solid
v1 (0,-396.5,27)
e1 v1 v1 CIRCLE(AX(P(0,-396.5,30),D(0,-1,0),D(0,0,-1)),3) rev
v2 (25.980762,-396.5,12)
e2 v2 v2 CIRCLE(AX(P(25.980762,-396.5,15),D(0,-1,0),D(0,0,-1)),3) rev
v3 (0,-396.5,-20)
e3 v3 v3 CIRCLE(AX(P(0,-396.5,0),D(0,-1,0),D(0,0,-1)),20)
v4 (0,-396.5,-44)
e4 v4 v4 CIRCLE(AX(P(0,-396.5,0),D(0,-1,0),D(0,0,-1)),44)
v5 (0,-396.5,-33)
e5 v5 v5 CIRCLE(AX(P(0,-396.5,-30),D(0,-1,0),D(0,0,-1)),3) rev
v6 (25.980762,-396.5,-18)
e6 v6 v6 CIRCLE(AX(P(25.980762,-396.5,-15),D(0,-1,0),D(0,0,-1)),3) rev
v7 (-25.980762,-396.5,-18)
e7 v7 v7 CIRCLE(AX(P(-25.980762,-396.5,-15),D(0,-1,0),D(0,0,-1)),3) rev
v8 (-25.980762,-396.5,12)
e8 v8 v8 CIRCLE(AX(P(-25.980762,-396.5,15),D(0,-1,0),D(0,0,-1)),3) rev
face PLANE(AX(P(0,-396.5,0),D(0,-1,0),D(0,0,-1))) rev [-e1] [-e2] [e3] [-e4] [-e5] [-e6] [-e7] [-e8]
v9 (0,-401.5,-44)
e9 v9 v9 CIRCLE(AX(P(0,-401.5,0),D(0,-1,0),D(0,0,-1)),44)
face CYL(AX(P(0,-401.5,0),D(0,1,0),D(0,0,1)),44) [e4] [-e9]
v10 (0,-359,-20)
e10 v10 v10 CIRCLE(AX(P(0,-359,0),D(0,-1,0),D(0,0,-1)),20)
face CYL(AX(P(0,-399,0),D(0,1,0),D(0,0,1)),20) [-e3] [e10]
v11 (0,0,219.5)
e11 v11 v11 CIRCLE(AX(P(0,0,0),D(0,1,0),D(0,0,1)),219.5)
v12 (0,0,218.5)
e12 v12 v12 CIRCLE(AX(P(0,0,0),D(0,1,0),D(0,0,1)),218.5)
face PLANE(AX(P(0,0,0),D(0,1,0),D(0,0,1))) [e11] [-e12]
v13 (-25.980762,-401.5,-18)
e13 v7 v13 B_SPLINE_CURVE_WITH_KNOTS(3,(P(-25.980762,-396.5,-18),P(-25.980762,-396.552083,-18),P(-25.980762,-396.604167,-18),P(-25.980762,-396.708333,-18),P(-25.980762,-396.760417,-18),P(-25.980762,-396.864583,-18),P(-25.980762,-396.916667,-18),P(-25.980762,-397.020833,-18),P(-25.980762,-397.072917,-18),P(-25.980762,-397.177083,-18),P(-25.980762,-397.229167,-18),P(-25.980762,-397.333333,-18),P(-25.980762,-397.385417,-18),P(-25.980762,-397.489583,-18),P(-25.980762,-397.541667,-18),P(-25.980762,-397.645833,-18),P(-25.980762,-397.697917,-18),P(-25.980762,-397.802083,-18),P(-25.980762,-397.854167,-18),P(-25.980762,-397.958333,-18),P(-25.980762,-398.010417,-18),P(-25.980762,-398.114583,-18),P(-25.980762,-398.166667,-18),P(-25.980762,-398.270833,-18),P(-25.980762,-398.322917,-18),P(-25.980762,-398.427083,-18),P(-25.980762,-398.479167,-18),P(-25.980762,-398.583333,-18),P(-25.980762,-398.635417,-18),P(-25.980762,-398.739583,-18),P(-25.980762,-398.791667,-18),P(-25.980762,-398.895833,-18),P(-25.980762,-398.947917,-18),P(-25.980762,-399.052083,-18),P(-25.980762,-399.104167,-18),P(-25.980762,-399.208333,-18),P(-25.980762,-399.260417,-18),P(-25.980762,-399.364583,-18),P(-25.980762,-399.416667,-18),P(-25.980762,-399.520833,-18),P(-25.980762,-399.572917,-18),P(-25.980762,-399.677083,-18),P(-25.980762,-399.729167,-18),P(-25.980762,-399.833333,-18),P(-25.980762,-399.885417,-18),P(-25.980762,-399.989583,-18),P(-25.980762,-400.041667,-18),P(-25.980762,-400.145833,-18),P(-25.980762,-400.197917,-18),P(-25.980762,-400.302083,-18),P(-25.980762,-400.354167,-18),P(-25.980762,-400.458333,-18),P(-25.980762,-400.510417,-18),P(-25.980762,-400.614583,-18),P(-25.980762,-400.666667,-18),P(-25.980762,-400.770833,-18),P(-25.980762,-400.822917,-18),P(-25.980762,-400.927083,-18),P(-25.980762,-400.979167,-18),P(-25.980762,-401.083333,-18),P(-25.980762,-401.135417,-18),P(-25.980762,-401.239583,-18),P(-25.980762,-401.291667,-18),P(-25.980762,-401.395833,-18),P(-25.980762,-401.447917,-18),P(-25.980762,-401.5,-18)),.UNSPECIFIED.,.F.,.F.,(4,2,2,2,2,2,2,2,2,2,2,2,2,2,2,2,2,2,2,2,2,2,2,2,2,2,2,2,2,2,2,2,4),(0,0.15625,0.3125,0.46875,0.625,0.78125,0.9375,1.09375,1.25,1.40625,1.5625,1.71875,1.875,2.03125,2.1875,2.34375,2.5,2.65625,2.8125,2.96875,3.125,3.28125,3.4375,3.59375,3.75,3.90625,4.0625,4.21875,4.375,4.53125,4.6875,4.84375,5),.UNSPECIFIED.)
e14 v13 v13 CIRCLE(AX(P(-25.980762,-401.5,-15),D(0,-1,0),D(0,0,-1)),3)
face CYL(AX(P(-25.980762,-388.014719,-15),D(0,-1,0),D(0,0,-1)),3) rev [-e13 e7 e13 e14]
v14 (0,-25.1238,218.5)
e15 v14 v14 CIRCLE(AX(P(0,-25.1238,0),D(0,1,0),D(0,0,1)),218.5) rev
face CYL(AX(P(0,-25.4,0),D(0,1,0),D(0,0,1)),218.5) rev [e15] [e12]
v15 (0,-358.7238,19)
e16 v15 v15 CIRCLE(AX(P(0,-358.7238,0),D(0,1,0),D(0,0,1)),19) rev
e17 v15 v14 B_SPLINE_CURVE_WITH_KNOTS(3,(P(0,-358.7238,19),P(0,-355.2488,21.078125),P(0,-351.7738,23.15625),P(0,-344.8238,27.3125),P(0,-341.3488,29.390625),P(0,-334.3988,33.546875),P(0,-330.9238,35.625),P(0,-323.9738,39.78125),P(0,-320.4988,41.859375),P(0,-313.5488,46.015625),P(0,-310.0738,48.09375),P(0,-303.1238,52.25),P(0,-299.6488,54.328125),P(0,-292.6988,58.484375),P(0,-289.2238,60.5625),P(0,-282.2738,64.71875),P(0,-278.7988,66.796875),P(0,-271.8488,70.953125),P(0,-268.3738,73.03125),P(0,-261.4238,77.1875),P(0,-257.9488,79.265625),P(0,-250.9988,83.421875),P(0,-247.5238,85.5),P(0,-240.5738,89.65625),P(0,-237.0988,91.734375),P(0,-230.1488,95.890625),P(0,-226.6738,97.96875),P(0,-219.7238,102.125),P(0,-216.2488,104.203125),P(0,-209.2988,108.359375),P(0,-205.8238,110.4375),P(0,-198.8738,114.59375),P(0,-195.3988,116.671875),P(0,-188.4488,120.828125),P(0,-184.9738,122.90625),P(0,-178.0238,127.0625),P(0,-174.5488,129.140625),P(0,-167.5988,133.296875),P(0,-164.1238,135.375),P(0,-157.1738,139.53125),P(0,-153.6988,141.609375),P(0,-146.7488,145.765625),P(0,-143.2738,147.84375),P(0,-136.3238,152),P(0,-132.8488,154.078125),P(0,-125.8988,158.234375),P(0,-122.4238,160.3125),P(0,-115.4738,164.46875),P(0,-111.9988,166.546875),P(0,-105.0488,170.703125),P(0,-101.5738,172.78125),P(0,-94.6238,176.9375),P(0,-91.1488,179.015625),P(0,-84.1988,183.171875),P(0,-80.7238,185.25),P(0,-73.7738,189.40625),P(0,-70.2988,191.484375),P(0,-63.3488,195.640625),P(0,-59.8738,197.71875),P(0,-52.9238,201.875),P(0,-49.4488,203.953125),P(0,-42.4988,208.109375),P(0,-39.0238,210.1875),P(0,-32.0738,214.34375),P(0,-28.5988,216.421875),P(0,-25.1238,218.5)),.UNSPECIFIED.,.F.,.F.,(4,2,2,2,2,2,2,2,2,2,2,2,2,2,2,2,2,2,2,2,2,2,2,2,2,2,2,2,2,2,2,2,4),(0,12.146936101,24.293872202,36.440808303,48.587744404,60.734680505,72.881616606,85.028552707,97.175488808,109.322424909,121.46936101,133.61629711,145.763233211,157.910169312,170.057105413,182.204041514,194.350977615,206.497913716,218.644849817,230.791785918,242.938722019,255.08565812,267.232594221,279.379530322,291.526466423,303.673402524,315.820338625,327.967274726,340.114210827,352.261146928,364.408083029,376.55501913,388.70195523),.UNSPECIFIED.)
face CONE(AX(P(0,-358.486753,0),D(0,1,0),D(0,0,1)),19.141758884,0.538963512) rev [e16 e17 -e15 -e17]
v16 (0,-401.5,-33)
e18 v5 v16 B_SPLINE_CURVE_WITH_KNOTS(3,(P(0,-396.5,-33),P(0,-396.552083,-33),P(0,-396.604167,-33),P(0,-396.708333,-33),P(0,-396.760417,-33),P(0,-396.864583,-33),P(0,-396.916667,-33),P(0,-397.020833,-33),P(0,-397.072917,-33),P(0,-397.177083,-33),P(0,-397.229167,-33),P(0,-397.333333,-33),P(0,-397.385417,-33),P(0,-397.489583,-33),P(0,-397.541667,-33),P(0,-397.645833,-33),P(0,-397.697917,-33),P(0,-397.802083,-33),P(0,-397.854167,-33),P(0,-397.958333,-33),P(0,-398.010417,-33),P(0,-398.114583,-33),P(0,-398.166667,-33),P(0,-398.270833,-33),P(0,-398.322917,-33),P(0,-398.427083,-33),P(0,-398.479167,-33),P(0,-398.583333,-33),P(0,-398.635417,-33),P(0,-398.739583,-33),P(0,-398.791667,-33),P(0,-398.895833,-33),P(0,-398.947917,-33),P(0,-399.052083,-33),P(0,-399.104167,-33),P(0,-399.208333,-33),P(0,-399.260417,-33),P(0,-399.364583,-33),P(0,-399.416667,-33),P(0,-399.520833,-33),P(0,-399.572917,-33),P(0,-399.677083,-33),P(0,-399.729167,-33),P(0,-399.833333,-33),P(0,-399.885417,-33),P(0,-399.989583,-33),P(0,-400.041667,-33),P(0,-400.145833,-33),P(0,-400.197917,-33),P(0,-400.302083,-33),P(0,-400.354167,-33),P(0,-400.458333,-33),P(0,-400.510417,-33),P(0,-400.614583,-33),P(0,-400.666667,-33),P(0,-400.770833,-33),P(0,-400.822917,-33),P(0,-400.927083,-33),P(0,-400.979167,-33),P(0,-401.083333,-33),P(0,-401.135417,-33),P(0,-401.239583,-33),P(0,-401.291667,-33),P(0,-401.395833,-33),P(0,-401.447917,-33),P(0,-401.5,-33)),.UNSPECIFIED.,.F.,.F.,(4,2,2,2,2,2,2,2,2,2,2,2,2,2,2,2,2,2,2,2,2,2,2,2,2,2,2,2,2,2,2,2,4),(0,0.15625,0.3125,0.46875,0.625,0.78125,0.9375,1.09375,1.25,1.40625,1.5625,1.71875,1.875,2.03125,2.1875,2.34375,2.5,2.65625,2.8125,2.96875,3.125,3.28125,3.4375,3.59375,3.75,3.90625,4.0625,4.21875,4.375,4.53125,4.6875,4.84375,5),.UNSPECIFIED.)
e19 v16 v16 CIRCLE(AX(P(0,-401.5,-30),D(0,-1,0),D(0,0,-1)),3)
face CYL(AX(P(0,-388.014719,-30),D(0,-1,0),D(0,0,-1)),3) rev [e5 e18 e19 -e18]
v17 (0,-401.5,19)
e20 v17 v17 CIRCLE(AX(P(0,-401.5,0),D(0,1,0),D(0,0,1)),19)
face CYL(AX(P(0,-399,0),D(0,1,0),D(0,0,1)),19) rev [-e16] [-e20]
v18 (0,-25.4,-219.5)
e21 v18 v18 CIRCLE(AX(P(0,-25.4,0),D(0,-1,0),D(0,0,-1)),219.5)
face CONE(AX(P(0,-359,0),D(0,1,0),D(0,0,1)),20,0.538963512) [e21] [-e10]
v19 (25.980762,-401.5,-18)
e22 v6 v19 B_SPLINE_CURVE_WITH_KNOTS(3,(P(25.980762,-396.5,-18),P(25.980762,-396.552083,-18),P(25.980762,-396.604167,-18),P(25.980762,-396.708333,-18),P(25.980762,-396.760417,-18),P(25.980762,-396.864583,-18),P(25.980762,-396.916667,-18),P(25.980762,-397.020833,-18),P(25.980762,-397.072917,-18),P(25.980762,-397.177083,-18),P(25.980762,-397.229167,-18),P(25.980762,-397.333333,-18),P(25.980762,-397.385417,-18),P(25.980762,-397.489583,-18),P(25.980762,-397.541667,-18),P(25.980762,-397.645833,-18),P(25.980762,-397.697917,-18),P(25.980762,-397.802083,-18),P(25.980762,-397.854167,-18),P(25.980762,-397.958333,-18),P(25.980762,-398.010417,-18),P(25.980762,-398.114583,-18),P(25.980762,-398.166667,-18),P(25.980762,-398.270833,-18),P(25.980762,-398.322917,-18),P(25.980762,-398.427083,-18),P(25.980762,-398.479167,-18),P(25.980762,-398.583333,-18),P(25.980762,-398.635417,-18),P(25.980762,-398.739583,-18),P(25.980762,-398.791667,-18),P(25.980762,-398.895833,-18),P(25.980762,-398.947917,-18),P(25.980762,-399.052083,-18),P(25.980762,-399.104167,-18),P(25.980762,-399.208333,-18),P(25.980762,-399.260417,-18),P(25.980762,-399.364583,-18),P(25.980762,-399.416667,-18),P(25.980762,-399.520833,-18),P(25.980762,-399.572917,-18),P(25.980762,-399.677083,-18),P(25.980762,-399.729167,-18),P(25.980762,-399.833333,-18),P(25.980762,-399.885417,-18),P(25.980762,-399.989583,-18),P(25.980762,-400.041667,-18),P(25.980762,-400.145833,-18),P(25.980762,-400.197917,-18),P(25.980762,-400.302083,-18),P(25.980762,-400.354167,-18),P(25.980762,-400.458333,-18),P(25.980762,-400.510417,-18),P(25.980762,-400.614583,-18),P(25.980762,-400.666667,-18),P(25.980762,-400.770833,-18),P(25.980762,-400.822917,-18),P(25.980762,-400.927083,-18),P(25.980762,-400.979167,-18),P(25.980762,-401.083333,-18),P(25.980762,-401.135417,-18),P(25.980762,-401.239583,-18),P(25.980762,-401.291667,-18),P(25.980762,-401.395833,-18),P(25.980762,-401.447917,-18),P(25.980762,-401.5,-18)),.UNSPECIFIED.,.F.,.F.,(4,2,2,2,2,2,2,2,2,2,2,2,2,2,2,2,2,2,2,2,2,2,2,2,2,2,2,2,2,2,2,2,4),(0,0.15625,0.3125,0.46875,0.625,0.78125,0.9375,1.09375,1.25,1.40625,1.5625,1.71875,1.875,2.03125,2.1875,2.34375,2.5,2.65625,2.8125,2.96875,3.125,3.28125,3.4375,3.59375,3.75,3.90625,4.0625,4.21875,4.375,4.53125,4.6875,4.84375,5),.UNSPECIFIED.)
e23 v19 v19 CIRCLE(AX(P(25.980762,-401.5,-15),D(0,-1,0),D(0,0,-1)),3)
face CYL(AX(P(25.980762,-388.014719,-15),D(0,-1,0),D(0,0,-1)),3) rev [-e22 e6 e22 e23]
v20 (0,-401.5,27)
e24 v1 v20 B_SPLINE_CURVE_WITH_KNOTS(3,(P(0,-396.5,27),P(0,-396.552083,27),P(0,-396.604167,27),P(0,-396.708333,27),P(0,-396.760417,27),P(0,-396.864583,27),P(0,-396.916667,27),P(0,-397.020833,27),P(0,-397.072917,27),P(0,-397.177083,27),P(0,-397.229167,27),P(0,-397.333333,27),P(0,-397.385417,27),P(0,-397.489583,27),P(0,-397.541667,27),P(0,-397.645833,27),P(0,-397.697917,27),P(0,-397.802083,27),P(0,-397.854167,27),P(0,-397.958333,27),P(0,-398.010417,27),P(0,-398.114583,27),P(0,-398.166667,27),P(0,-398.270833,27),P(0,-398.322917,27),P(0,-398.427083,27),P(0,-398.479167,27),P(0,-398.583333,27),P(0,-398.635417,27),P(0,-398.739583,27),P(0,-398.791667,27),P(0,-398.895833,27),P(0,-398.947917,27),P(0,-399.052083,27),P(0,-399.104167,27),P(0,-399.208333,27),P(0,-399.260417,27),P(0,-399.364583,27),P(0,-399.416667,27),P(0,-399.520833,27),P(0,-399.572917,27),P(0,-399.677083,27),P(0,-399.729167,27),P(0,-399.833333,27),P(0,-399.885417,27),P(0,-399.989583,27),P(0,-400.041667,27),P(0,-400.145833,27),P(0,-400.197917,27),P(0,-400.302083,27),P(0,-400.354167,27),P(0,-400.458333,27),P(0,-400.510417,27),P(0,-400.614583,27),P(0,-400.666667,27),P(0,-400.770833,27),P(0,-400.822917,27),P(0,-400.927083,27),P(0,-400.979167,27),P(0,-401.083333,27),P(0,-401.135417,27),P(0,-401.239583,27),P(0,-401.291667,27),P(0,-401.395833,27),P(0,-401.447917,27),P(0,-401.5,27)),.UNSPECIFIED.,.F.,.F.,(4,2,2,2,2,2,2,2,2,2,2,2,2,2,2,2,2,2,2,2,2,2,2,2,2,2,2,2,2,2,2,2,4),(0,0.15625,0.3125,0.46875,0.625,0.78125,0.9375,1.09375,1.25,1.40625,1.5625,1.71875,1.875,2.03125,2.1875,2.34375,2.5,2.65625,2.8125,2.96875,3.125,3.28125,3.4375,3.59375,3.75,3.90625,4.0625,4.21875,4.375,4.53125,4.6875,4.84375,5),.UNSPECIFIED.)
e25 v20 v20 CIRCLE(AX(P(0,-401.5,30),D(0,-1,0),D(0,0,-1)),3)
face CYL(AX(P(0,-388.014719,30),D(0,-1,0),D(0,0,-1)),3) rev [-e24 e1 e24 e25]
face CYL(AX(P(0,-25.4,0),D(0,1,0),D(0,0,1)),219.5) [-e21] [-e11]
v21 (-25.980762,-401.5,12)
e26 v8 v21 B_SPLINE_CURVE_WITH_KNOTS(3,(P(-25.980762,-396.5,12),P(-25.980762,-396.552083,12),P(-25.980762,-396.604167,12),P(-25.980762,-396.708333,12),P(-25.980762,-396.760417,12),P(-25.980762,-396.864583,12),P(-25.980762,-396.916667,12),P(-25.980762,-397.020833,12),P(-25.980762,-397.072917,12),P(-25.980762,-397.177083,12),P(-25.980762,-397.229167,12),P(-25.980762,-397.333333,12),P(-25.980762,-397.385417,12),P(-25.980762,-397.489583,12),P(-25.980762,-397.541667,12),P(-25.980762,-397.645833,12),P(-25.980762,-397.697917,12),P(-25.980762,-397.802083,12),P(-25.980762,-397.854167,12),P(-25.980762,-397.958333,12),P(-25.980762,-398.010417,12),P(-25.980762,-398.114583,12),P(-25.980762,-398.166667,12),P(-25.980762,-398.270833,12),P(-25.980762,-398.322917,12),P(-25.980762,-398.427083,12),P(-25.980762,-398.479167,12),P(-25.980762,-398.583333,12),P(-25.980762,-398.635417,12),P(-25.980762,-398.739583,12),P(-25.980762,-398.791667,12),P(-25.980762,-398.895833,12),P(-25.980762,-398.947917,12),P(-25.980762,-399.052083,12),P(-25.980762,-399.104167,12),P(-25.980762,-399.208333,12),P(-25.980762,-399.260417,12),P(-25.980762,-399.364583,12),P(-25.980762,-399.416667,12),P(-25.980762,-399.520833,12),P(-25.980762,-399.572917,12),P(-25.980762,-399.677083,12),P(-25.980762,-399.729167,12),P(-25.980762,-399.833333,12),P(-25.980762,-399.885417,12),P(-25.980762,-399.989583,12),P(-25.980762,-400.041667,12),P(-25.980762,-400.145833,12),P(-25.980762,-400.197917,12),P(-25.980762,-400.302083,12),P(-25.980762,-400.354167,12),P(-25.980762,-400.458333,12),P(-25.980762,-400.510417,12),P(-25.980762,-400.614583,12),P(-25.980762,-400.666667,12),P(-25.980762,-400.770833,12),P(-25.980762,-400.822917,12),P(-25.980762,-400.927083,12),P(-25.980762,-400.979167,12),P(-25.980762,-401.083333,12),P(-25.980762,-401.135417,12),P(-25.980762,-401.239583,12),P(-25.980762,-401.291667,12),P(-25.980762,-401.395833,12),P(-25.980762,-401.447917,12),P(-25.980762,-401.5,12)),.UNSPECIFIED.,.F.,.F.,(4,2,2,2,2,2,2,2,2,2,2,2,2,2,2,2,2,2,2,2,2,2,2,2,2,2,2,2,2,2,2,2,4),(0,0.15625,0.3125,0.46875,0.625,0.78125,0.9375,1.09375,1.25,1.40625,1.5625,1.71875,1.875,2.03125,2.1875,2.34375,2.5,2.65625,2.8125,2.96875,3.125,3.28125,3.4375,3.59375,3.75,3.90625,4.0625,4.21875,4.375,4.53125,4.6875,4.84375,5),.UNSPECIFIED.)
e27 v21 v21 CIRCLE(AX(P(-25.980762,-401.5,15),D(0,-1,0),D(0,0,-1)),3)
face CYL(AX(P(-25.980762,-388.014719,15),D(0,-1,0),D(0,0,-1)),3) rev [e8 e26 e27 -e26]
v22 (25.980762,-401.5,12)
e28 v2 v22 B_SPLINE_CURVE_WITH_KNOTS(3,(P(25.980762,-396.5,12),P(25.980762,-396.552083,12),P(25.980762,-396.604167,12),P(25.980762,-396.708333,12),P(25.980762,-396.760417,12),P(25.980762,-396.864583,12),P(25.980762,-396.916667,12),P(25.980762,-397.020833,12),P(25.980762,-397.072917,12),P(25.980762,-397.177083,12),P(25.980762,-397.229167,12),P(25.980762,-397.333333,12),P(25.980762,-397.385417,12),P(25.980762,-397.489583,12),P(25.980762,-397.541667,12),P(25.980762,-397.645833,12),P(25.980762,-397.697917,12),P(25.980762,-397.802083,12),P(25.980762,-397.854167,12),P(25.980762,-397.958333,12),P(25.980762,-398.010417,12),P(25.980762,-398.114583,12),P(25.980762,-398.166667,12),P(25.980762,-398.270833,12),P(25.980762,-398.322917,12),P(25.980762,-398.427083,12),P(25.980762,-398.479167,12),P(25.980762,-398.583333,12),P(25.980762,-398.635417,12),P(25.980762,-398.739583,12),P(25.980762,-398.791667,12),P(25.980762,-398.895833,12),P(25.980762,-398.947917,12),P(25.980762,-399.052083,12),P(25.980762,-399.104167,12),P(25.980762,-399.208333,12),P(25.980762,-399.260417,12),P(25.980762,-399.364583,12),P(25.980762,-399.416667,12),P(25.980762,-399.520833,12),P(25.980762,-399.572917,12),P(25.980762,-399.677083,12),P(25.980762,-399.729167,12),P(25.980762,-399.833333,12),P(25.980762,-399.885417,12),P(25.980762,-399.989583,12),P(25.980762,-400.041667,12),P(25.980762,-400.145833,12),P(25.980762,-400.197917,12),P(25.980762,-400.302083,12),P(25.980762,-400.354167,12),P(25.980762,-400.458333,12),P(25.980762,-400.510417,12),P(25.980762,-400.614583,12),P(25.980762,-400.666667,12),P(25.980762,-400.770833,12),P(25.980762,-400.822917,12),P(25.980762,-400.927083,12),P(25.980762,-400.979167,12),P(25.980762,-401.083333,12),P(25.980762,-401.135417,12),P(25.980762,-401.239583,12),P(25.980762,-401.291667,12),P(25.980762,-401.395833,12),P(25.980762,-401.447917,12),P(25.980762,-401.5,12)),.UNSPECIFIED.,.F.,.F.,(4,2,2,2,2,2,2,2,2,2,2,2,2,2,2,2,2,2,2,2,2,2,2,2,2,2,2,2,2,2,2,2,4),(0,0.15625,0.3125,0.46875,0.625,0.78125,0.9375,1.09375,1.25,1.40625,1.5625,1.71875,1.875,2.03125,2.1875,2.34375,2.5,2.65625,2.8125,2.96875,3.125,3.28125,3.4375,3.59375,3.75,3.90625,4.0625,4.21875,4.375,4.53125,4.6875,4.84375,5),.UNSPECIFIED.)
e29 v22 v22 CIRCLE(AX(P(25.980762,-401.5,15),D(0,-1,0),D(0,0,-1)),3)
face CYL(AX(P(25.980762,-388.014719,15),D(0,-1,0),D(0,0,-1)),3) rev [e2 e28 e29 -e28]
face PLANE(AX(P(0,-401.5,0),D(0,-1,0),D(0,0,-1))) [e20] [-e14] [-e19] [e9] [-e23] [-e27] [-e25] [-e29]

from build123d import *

# Parameters (mm, degrees)
CROQUIS1_R              = 219.5
SALIENTE_EXTRUIR1_DEPTH = 25.4
CROQUIS3_R              = 20
CROQUIS2_R              = 219.5
CROQUIS4_R              = 20
SALIENTE_EXTRUIR2_DEPTH = 40
CROQUIS10_R             = 44
SALIENTE_EXTRUIR6_DEPTH = 2.5
CROQUIS15_R             = 19
CORTAR_EXTRUIR1_DEPTH   = 504.560075947
CROQUIS16_R             = 3
CORTAR_EXTRUIR2_DEPTH   = 5


# Read off the part's stored shape, not the designer's step: Vaciado3
with BuildPart() as part:
    # Croquis1 → Saliente-Extruir1 (new body)
    with BuildSketch(Plane(origin=(0, 0, 0), x_dir=(1, 0, 0), z_dir=(0, 1, 0))):
        with Locations(Location((0, 0, 0), (0, 0, 270))):
            Circle(CROQUIS1_R)
    extrude(amount=-SALIENTE_EXTRUIR1_DEPTH)

    # Croquis3 → Recubrir1 section 0
    with BuildSketch(Plane(origin=(0, -359, 0), x_dir=(1, 0, 0), z_dir=(0, 1, 0))):
        Circle(CROQUIS3_R)
    # Croquis2 → Recubrir1 section 1
    with BuildSketch(Plane.XZ.offset(25.4)):
        Circle(CROQUIS2_R)
    loft()

    # Croquis4 → Saliente-Extruir2 (add)
    with BuildSketch(Plane.XZ.offset(359)):
        with Locations(Location((0, 0, 0), (0, 0, 270))):
            Circle(CROQUIS4_R)
    extrude(amount=SALIENTE_EXTRUIR2_DEPTH)

    # Vaciado3 outline → Vaciado3 (revolve, cut)
    with BuildSketch(Plane.XY):
        Polygon((218.5, -25.123799723), (218.5, 0), (0, 0), (0, -399), (19, -399), (19, -358.723799723), align=None)
    revolve(axis=Axis((0, 0, 0), (0, 1, 0)), mode=Mode.SUBTRACT)

    # Croquis10 → Saliente-Extruir6 (add, symmetric)
    with BuildSketch(Plane.XZ.offset(399)):
        with Locations(Location((0, 0, 0), (0, 0, 270))):
            Circle(CROQUIS10_R)
    extrude(amount=SALIENTE_EXTRUIR6_DEPTH, both=True)

    # Croquis15 → Cortar-Extruir1 (cut, through all)
    with BuildSketch(Plane(origin=(0, -396.5, 0), x_dir=(1, 0, 0), z_dir=(0, 1, 0))):
        with Locations(Location((0, 0, 0), (0, 0, 270))):
            Circle(CROQUIS15_R)
    extrude(amount=-CORTAR_EXTRUIR1_DEPTH, mode=Mode.SUBTRACT)

    # Croquis16 → Cortar-Extruir2 (cut)
    with BuildSketch(Plane.XZ.offset(401.5)):
        with Locations(Location((0, -30, 0), (0, 0, 270))):
            Circle(CROQUIS16_R)
        with Locations(Location((-25.980762114, -15, 0), (0, 0, 270))):
            Circle(CROQUIS16_R)
        with Locations(Location((-25.980762114, 15, 0), (0, 0, 270))):
            Circle(CROQUIS16_R)
        with Locations(Location((0, 30, 0), (0, 0, 270))):
            Circle(CROQUIS16_R)
        with Locations(Location((25.980762114, 15, 0), (0, 0, 270))):
            Circle(CROQUIS16_R)
        with Locations(Location((25.980762114, -15, 0), (0, 0, 270))):
            Circle(CROQUIS16_R)
    extrude(amount=-CORTAR_EXTRUIR2_DEPTH, mode=Mode.SUBTRACT)


solid = part.part
